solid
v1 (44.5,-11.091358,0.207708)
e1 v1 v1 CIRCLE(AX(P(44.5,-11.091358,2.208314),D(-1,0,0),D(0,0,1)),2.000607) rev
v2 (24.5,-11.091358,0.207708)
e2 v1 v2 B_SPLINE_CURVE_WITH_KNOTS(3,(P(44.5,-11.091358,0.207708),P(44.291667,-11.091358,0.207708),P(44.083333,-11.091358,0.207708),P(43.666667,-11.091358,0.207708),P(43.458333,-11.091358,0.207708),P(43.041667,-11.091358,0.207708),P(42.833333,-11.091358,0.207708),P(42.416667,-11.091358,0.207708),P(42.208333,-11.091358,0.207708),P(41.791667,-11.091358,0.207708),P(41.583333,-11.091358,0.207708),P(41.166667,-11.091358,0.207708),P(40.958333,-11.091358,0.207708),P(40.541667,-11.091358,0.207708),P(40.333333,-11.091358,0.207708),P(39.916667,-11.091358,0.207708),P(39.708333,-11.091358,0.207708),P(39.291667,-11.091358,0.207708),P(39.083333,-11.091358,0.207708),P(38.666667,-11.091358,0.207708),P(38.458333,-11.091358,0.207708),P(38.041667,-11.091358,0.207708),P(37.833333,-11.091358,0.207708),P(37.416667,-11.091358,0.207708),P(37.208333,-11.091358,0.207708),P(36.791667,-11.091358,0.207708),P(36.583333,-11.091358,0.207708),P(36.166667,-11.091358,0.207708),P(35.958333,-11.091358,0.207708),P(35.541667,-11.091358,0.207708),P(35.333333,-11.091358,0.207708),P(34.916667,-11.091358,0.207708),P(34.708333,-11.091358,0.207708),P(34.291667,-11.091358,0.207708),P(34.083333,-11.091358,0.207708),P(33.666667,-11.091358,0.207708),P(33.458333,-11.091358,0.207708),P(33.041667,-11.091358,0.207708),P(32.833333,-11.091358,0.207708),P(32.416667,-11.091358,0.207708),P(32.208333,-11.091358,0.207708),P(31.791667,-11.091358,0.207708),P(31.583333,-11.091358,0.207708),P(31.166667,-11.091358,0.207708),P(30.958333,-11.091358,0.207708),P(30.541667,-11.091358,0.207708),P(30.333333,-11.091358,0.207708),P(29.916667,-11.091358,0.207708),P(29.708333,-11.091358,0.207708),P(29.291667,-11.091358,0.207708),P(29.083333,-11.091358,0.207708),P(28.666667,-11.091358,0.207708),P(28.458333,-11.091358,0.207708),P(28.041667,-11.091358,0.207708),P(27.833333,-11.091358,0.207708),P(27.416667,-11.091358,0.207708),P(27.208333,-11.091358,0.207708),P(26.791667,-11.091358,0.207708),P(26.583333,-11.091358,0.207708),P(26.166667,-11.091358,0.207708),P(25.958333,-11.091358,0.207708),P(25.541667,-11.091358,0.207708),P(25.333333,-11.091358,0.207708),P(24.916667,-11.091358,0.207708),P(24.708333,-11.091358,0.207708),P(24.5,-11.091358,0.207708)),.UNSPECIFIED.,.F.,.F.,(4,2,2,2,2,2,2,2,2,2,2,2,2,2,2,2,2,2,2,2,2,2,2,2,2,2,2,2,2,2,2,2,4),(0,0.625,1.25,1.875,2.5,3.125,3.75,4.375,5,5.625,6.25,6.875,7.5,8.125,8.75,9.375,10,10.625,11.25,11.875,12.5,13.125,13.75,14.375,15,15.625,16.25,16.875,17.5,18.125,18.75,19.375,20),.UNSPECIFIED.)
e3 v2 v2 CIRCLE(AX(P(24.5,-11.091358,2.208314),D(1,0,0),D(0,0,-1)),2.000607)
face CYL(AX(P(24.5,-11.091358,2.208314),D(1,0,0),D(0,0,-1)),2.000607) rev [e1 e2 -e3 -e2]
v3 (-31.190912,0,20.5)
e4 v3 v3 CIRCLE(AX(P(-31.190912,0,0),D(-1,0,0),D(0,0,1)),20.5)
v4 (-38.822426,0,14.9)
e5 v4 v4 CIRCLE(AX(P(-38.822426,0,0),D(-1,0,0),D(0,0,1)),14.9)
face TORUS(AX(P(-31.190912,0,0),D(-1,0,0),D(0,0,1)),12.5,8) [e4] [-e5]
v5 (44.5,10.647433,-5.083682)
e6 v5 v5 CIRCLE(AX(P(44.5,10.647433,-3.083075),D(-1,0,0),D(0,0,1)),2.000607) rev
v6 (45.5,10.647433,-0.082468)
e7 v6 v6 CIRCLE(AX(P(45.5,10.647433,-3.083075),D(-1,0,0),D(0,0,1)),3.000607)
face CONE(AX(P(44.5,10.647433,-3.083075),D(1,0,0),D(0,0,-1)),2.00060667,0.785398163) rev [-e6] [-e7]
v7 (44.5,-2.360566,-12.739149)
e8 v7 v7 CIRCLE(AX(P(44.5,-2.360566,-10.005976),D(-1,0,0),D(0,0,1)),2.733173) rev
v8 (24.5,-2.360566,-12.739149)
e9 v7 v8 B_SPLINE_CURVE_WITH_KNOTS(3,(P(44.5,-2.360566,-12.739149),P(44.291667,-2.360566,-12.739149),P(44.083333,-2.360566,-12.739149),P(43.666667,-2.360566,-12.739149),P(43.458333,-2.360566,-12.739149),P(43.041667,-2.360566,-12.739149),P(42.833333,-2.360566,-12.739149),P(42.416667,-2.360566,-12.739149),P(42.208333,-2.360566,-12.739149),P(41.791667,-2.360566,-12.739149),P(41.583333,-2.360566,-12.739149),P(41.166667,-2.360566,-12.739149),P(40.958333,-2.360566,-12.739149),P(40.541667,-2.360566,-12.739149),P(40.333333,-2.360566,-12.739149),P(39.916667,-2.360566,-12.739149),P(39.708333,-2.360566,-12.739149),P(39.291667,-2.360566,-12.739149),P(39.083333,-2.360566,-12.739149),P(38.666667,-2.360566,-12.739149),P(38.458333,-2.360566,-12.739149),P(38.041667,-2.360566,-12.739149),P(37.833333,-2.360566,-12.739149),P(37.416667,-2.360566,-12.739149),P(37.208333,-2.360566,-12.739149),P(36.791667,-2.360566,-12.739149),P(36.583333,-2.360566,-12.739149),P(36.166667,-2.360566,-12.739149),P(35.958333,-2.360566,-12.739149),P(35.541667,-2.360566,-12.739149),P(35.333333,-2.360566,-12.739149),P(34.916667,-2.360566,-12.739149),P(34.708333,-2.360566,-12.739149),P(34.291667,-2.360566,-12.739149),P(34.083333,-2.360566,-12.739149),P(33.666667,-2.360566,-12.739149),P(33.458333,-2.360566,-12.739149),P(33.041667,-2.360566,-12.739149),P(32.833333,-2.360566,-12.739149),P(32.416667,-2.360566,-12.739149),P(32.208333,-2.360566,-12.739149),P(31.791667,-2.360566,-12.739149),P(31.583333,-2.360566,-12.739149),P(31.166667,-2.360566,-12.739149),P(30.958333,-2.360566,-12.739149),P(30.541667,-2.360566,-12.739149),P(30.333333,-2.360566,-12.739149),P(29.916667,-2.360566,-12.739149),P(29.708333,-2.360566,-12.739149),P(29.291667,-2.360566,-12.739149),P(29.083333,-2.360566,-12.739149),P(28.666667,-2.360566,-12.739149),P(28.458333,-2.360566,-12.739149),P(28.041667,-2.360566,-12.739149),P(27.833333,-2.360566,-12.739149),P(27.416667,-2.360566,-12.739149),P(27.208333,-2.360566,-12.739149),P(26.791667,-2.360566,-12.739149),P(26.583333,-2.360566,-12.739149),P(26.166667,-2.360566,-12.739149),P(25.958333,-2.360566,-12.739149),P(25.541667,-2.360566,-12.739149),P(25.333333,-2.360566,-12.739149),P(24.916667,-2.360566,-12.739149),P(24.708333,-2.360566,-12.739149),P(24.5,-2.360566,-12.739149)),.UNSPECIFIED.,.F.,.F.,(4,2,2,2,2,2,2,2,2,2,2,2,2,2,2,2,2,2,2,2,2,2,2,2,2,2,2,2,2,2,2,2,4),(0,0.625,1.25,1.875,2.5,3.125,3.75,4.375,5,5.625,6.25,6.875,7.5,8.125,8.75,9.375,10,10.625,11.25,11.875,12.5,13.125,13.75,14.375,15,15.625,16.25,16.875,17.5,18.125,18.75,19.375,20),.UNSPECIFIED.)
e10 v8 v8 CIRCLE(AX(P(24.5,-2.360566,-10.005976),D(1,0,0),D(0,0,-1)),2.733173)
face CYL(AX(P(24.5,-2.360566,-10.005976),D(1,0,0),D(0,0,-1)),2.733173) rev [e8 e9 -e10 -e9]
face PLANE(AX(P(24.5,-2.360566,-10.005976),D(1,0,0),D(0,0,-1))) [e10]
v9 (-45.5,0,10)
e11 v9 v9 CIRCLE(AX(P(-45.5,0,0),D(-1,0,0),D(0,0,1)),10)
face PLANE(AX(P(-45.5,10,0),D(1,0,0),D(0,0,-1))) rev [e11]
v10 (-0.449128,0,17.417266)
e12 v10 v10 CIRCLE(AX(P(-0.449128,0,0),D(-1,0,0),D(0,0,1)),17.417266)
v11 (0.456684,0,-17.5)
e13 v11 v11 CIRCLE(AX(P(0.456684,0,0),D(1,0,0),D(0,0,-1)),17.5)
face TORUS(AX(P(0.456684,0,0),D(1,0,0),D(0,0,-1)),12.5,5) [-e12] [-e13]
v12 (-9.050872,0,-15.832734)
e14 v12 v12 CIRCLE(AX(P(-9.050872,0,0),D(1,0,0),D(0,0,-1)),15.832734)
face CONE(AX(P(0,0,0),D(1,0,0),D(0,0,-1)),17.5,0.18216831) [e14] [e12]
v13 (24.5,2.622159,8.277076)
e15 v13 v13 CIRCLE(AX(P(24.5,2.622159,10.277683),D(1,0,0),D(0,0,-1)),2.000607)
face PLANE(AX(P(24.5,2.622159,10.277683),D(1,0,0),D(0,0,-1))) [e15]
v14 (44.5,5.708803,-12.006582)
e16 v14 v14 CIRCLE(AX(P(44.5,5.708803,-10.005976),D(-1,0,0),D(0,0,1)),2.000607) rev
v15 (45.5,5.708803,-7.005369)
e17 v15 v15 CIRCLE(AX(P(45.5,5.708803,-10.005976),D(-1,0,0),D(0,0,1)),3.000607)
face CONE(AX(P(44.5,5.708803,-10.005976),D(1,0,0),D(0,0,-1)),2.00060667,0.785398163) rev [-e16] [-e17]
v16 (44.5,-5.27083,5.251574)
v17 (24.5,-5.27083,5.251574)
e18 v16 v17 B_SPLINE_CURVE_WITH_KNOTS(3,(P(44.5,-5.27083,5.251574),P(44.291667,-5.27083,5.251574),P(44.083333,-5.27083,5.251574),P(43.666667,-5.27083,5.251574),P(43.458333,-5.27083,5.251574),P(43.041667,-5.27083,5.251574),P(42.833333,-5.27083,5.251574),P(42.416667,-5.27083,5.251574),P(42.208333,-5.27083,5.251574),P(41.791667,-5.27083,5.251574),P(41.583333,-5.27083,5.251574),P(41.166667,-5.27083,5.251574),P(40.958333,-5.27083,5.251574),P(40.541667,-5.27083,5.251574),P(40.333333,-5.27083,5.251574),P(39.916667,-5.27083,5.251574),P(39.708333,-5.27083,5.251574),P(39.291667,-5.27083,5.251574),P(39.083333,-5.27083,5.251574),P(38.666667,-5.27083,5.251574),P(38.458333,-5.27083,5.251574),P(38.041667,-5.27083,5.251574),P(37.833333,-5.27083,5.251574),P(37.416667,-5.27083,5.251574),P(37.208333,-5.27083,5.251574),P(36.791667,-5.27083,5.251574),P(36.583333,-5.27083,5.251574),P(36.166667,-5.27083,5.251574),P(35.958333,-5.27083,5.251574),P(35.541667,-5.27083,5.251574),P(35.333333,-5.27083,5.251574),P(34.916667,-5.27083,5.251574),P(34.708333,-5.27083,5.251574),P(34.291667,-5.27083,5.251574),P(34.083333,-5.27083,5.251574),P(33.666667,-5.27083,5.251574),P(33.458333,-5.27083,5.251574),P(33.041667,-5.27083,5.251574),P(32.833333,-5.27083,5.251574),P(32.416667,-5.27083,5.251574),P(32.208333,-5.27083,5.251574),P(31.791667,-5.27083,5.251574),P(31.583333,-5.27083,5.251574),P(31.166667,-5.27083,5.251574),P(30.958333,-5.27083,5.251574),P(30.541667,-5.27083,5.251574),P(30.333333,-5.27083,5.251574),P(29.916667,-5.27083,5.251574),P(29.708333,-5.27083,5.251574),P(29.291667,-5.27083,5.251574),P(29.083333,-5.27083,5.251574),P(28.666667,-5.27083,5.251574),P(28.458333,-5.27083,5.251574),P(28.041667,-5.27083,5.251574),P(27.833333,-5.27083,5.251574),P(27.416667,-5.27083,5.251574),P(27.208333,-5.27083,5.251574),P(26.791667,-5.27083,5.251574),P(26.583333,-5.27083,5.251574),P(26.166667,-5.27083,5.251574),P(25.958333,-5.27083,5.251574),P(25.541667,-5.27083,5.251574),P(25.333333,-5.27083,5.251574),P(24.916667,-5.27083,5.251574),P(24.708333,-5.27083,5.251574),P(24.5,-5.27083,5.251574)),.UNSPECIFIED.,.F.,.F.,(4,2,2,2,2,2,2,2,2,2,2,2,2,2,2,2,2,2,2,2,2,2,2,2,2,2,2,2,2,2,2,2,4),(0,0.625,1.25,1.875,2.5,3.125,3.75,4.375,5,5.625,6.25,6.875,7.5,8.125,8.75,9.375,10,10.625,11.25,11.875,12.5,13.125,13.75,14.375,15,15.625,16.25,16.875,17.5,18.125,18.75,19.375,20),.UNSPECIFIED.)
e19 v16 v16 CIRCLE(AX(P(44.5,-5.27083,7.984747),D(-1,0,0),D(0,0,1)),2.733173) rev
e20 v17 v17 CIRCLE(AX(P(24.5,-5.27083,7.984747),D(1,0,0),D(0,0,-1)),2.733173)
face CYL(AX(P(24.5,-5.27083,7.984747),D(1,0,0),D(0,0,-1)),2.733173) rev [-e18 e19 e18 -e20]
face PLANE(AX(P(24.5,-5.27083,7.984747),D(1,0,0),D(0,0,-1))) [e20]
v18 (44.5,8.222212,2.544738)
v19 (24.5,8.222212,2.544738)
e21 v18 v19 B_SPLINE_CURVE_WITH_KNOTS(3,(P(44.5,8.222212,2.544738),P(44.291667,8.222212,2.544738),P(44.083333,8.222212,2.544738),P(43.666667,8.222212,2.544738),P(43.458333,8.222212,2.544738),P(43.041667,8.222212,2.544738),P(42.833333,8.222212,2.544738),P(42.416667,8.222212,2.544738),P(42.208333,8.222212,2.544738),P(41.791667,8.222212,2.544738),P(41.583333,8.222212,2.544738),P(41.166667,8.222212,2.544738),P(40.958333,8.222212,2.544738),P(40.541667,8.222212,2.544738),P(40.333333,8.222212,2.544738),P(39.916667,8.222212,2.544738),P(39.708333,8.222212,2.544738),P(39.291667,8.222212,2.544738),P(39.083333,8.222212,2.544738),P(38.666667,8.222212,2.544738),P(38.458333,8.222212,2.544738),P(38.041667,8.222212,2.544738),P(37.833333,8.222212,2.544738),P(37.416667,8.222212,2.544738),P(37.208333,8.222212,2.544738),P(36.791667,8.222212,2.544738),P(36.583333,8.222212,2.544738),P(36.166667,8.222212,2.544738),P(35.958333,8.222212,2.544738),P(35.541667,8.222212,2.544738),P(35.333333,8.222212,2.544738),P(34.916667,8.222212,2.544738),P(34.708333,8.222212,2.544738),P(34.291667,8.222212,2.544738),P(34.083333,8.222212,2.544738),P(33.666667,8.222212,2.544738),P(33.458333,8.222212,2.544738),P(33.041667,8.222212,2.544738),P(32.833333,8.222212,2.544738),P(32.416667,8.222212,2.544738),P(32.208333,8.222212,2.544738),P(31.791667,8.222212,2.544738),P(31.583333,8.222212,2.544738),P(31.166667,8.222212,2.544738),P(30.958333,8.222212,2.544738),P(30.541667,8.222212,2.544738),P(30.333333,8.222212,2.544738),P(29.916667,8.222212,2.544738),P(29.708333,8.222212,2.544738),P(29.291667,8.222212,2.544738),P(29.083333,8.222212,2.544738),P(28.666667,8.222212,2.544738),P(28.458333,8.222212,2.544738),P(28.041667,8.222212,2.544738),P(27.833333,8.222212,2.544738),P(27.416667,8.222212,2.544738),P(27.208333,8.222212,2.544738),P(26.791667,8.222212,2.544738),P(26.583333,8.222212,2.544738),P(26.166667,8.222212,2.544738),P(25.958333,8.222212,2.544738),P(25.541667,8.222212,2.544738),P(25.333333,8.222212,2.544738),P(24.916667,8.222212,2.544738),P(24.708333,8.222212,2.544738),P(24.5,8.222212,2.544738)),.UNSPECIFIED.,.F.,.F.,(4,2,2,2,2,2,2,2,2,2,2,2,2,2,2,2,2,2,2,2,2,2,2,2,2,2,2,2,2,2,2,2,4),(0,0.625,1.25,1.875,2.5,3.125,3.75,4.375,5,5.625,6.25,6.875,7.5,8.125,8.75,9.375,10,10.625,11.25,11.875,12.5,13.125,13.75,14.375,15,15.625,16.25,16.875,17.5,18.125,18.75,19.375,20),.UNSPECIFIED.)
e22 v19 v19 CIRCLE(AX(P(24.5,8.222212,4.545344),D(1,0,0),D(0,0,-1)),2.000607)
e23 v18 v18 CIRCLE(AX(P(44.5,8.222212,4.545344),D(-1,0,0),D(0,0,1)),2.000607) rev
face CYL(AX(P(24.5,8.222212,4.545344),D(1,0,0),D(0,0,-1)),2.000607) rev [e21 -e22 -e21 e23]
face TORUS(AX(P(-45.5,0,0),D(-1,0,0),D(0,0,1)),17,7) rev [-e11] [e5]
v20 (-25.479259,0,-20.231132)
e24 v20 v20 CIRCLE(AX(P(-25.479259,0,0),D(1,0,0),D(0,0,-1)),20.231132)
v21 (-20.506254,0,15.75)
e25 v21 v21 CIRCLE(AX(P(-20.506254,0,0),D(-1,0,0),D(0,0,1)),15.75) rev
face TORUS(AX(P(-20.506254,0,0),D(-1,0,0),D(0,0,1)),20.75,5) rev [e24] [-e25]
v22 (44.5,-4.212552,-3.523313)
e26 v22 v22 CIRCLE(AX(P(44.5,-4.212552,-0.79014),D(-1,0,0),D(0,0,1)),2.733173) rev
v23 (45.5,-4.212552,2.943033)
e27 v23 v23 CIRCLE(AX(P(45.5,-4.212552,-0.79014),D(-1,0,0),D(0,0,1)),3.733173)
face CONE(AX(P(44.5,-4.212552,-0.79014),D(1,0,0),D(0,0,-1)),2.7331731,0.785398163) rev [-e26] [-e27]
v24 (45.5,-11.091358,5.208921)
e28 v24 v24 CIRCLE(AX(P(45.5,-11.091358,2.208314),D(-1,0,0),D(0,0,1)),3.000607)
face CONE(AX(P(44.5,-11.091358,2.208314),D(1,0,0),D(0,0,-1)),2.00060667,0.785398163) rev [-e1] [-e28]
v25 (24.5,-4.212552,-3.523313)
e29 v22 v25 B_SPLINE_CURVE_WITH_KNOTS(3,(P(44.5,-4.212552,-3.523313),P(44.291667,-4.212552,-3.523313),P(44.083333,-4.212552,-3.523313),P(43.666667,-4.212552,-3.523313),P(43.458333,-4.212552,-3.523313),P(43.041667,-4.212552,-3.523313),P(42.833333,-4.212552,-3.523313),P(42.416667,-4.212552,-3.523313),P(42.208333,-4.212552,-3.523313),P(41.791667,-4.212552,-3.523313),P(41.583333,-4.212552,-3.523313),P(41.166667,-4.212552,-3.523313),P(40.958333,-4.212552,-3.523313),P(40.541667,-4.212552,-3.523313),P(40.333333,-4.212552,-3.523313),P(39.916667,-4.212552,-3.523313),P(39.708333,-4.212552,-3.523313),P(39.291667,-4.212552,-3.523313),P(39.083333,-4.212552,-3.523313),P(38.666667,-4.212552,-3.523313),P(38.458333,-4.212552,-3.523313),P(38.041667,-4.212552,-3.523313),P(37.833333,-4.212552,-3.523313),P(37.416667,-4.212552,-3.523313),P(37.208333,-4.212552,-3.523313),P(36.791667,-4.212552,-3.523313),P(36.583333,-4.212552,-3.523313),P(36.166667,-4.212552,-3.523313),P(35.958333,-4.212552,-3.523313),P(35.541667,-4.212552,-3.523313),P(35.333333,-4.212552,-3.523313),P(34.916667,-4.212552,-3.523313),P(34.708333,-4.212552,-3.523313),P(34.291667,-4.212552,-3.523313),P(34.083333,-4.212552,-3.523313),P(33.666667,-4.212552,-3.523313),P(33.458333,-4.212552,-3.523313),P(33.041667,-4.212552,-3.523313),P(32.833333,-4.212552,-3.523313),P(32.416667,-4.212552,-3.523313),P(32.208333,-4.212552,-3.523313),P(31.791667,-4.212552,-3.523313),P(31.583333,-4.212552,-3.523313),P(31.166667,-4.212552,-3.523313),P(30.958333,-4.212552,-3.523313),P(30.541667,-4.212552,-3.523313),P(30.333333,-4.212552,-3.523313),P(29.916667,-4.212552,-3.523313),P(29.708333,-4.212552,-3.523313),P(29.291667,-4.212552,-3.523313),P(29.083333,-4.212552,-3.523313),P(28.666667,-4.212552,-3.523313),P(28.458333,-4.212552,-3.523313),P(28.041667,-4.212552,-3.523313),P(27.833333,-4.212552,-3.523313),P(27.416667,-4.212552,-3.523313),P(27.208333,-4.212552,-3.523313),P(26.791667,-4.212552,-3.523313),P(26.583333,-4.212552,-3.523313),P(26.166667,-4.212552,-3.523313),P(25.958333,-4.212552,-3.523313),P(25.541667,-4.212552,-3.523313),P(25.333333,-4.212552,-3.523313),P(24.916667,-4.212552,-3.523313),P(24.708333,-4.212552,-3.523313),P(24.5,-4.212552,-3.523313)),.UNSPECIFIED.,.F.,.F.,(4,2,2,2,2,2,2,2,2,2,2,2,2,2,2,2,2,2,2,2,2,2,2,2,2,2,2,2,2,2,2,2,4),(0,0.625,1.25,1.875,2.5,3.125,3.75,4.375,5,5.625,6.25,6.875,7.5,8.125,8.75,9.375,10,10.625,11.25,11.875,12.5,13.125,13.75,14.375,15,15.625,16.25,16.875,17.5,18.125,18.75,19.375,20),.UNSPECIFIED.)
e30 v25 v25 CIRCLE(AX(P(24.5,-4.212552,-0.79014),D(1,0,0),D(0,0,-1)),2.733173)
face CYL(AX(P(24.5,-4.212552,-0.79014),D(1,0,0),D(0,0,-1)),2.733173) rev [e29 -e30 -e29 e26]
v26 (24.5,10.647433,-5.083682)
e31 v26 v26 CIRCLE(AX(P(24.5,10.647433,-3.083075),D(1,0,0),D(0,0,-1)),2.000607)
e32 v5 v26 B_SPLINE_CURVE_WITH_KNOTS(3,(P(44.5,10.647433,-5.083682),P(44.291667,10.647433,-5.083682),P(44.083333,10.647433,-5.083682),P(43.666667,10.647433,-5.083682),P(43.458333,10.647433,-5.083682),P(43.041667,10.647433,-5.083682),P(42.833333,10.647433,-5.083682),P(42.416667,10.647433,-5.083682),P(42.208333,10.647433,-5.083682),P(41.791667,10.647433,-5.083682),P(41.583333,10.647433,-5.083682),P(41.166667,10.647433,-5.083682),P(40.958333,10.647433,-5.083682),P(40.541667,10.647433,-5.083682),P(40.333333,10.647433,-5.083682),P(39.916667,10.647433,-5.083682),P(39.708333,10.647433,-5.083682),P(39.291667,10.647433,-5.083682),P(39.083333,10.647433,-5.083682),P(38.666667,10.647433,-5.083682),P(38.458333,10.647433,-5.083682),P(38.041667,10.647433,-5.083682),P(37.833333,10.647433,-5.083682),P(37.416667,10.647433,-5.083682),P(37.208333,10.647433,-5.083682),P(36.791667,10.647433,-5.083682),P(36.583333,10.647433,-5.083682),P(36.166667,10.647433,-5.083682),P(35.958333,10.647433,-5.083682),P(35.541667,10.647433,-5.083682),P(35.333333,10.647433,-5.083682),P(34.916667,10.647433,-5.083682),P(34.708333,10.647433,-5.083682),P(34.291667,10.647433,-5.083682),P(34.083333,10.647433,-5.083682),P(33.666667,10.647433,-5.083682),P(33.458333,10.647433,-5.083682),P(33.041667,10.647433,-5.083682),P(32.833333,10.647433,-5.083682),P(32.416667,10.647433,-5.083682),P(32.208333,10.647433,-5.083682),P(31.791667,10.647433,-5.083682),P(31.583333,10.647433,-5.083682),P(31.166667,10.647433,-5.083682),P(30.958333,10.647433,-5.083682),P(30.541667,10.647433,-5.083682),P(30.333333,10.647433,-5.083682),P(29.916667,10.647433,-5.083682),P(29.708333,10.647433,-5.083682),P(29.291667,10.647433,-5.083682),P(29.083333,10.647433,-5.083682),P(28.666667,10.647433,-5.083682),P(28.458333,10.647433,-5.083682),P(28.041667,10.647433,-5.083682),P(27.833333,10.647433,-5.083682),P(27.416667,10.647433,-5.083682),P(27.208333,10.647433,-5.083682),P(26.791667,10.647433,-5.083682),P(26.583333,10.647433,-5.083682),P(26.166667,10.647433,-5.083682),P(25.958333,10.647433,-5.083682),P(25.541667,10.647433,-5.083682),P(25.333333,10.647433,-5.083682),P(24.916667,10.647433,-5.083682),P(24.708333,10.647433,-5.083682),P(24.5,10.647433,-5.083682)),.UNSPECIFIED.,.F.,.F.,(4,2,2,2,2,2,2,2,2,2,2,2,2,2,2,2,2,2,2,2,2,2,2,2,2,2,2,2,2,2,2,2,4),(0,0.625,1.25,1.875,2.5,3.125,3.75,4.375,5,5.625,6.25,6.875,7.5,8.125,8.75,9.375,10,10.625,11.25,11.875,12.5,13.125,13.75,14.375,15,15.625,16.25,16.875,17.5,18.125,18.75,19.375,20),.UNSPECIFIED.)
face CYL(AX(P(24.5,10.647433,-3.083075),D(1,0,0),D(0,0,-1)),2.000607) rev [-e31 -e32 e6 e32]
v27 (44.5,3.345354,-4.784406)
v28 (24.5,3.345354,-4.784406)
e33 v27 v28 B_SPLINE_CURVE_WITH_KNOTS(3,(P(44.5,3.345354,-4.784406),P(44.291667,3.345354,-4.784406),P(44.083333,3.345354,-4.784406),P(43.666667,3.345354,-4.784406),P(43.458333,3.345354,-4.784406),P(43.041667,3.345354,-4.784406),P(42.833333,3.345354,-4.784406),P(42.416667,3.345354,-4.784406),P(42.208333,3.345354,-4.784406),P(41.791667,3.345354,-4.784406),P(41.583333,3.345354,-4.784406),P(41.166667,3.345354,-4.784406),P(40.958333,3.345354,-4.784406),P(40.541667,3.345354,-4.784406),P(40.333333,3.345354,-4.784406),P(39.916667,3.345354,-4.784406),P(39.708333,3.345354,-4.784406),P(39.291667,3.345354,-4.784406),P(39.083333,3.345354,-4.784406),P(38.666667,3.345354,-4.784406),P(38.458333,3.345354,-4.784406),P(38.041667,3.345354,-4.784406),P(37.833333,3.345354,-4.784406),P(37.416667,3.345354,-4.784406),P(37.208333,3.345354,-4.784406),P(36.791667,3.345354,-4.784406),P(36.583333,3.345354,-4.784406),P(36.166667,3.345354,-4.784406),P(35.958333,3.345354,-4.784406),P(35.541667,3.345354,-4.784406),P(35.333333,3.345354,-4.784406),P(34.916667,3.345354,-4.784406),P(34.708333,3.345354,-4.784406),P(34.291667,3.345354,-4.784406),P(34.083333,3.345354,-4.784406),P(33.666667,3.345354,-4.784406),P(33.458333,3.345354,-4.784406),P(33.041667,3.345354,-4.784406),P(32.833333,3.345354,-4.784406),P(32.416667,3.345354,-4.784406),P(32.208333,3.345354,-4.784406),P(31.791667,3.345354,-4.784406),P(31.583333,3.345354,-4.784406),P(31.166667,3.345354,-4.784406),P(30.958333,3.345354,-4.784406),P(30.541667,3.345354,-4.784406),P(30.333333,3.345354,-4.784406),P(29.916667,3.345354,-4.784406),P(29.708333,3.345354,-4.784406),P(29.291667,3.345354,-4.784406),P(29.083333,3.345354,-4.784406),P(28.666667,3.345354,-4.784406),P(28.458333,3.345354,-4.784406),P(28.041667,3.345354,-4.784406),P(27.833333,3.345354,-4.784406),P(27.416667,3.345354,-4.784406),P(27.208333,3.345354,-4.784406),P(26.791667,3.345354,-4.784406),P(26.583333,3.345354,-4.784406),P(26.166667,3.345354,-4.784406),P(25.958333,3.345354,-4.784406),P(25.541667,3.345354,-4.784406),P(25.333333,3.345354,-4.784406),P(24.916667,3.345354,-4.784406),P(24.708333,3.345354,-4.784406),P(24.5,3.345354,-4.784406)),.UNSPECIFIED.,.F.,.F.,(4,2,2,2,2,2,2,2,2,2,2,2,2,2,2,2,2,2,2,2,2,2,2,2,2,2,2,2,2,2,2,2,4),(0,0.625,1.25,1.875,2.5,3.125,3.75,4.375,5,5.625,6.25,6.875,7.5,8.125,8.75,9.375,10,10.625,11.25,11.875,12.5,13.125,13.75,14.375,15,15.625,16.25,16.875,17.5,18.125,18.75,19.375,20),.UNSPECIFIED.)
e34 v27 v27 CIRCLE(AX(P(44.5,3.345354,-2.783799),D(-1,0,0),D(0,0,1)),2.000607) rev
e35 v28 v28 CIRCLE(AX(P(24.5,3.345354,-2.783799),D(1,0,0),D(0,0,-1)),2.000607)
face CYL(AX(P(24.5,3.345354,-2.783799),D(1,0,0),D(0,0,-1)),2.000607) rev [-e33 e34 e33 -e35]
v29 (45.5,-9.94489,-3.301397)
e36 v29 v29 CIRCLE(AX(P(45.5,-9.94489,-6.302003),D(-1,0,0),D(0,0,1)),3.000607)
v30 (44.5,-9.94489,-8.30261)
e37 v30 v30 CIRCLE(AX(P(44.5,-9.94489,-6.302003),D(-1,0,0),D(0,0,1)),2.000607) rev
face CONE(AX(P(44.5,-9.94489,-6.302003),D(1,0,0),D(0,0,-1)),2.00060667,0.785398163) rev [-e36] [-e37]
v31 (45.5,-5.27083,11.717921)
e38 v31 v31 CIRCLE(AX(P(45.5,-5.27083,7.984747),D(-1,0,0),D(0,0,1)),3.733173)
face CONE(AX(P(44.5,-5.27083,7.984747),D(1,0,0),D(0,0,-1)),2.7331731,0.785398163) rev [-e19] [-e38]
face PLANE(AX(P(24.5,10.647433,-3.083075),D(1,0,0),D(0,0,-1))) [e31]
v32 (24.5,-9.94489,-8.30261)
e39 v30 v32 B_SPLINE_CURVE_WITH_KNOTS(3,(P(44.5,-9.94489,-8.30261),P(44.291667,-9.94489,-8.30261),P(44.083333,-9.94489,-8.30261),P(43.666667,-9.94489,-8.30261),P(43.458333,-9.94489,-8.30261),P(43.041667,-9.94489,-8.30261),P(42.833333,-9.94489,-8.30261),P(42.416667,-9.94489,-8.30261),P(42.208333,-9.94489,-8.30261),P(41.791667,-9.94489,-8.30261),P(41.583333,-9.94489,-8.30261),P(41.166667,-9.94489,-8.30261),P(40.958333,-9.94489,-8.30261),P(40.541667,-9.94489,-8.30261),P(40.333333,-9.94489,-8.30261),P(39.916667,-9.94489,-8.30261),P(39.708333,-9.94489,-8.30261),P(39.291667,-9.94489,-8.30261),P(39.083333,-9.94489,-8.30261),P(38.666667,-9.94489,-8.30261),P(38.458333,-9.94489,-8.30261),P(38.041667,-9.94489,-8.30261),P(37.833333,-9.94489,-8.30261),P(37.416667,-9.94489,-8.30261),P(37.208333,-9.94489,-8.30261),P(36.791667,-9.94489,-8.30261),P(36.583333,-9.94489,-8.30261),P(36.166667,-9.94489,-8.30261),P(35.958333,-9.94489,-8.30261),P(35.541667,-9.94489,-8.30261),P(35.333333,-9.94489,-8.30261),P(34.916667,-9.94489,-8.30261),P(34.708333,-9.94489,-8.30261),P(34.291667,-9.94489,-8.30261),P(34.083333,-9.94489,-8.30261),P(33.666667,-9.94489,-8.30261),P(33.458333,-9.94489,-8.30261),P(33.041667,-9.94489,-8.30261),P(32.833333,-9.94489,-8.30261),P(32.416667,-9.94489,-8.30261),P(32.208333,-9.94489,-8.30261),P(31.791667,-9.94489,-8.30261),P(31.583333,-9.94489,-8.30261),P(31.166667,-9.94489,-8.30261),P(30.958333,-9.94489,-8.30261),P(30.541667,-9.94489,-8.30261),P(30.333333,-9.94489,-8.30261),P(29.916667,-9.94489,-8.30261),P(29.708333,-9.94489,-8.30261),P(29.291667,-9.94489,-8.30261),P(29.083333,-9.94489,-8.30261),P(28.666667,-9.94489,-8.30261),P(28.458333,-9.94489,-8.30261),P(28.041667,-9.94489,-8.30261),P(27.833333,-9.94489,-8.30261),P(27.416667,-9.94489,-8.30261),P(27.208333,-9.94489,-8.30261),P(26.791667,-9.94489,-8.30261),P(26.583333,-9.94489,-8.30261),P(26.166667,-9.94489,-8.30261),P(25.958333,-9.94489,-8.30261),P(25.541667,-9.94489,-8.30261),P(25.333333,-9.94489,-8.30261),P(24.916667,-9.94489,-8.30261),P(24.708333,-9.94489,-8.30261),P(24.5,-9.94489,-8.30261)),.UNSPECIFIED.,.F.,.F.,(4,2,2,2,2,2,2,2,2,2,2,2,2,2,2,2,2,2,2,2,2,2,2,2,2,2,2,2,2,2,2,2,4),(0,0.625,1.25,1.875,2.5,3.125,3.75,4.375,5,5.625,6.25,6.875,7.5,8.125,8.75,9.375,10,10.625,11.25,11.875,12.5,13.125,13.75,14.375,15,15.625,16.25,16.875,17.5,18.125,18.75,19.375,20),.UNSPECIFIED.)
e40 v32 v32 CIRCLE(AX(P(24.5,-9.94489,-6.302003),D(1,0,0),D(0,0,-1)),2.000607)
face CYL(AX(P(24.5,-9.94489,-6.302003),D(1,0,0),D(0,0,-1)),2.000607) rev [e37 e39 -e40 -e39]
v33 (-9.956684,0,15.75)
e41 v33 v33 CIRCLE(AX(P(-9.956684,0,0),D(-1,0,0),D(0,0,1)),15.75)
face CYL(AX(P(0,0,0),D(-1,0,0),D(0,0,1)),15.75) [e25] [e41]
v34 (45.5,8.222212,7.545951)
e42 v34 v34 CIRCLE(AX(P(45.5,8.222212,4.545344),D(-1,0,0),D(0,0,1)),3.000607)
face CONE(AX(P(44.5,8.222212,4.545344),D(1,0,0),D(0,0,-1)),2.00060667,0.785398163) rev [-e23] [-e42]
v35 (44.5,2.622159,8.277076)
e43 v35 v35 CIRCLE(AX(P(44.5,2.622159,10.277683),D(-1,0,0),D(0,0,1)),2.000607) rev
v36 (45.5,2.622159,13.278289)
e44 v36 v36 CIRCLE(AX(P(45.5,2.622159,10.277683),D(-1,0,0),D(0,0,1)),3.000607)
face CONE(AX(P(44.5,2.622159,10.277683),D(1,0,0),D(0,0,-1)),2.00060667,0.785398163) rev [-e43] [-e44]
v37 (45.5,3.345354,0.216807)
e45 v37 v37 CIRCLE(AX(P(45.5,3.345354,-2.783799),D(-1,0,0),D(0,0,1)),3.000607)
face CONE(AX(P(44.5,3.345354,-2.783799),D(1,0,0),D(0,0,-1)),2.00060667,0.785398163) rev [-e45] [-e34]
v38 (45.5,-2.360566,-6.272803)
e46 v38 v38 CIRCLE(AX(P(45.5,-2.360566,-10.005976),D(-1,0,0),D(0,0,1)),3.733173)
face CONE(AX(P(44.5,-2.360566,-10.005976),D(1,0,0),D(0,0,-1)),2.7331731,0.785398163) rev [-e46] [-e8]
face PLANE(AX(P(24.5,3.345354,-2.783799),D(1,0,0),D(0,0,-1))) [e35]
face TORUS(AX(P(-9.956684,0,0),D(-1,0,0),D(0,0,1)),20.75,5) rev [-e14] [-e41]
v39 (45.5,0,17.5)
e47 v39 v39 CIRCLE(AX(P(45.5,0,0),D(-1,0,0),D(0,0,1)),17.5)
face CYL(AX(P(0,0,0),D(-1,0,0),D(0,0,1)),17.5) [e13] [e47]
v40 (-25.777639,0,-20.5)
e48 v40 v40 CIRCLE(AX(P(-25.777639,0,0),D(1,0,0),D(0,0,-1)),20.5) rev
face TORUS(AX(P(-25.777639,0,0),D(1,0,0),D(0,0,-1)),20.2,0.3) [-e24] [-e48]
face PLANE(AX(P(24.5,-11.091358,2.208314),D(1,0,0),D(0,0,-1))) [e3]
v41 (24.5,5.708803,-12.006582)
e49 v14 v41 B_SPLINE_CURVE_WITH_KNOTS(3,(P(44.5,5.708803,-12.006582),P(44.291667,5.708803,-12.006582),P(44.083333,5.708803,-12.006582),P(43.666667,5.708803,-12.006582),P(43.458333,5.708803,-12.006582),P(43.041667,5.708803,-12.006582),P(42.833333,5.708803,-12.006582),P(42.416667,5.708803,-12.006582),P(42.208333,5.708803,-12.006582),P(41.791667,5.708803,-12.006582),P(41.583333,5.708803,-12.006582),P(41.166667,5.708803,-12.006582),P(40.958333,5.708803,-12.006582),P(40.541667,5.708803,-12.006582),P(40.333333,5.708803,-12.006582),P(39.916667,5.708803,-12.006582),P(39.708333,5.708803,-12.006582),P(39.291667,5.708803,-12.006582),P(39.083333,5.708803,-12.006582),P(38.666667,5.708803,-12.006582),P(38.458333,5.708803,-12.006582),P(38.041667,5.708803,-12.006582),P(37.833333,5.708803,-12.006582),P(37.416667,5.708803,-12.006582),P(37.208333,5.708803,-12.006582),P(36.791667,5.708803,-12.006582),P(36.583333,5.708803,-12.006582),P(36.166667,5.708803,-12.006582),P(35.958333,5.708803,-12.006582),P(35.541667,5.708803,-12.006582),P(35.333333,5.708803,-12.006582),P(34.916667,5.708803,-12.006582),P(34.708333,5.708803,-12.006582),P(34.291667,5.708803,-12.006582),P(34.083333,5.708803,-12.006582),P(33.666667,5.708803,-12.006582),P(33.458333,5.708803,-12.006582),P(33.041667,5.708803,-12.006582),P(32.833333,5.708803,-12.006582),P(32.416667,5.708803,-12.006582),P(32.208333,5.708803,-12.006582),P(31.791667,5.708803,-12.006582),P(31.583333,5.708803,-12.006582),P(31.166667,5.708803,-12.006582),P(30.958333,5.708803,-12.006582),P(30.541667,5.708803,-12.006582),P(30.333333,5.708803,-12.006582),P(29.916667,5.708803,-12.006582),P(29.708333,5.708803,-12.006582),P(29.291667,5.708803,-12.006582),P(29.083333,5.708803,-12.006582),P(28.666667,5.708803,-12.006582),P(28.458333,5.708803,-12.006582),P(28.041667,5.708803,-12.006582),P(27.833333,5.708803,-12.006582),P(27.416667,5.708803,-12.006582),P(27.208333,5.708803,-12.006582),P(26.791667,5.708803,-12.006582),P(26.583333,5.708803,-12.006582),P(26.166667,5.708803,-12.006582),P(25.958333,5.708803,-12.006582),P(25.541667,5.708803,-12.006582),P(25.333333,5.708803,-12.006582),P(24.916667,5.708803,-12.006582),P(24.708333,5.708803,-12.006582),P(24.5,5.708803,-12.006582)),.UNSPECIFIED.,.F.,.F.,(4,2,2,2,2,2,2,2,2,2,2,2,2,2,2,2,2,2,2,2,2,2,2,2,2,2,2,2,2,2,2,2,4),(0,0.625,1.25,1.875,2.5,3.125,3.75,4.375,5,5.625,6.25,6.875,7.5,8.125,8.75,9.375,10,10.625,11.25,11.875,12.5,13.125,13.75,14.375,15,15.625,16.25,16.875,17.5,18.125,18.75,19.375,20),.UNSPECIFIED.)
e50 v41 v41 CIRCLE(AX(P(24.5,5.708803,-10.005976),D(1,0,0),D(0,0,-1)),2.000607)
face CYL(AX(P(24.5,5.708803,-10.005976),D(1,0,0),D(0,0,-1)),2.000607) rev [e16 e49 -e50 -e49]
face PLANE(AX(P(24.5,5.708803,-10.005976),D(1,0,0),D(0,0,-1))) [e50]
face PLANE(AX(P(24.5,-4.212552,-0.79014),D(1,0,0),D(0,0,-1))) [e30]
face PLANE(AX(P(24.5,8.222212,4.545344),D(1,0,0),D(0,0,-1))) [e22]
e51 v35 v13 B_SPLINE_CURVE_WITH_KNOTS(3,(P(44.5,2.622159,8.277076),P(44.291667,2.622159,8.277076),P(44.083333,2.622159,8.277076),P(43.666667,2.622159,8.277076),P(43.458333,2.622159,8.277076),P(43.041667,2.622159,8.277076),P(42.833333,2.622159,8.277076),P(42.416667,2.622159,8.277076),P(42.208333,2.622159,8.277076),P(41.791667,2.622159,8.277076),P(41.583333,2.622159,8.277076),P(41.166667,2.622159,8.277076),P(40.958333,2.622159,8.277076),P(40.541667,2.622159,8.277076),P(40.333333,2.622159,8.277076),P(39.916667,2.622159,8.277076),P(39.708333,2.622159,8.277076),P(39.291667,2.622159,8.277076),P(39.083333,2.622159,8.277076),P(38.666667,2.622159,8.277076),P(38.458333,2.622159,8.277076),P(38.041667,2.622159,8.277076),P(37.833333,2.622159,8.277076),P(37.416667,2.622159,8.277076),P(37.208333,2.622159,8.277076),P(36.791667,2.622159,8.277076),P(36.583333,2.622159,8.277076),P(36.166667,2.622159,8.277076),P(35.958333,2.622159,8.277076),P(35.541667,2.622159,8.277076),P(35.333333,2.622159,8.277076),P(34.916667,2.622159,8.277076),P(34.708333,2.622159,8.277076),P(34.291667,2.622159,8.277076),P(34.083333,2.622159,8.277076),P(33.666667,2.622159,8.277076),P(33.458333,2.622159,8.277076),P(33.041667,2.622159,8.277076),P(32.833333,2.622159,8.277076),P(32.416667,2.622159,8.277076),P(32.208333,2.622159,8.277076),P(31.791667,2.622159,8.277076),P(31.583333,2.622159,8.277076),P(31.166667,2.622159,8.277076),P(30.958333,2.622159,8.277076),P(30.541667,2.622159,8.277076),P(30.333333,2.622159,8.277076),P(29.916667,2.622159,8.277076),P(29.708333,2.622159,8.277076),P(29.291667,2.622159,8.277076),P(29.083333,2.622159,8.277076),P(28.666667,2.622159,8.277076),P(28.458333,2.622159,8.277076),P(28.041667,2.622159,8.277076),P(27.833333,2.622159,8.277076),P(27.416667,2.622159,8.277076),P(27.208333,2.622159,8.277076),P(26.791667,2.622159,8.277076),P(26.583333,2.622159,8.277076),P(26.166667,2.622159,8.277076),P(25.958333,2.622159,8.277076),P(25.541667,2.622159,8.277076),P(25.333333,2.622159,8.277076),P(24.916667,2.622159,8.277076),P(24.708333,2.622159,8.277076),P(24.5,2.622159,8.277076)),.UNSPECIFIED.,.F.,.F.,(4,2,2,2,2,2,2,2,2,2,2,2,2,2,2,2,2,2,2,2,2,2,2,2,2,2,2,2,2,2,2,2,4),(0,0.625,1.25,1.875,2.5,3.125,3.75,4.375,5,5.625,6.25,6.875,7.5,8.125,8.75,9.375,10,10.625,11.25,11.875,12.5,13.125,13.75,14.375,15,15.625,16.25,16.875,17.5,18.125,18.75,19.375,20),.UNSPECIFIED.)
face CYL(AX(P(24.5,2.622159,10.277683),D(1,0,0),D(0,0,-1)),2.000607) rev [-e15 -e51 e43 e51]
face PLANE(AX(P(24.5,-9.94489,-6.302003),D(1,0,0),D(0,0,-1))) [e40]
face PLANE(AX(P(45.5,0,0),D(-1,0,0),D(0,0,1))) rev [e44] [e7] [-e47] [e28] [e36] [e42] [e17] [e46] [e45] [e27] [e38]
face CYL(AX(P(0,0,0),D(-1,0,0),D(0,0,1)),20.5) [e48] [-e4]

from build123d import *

# Parameters (mm, degrees)
FILLET1_R          = 5
FILLET2_R          = 0.3
FILLET3_R          = 5
SKETCH6_R          = 2.0006066698857174
SKETCH6_R_2        = 2.000606669885716
SKETCH6_R_3        = 2.733173099565215
SKETCH6_R_4        = 2.733173099565216
CUT_EXTRUDE1_DEPTH = 21
CHAMFER1_SIZE      = 1


with BuildPart() as part:
    # Sketch3 → Revolve1 (revolve)
    with BuildSketch(Plane.XY, mode=Mode.PRIVATE) as revolve1_sk:
        with BuildLine():
            Line((45.5, 0), (45.5, 17.499999999999996))
            Line((45.5, 17.499999999999996), (0, 17.500000000006253))
            Line((0, 17.500000000006253), (-9.5, 15.75))
            Line((-9.5, 15.75), (-25.499999999999996, 15.749999999999996))
            Line((-25.499999999999996, 15.749999999999996), (-25.499999999999996, 20.5))
            Line((-25.499999999999996, 20.5), (-31.190911978745817, 20.5))
            ThreePointArc((-31.190911978745817, 20.5), (-35.92377580522551, 18.949806198638836), (-38.82242559008138, 14.9))
            ThreePointArc((-38.82242559008138, 14.9), (-41.358744151830265, 11.356419576191016), (-45.5, 10))
            Line((-45.5, 10), (-45.5, 0))
            Line((-45.5, 0), (45.5, 0))
        make_face()
    revolve(revolve1_sk.sketch.rotate(Axis((0, 0, 0), (1, 0, 0)), 90), axis=Axis((0, 0, 0), (1, 0, 0)))

    # Fillet1
    # the kernel refuses this fillet: 5 mm, written as the material it adds along each edge
    with BuildSketch(Plane(origin=(-25.499999999999996, 0, 0), x_dir=(0, 1.1e-16, 1), z_dir=(0, 1, -1.1e-16))) as fillet1_piece_1:
        with BuildLine():
            CenterArc((20.75, 4.993746088859542), FILLET1_R, 180, 87.13401601740111)
            Line((20.5, -3.55e-15), (20.495, -0.09987492177719304))
            ThreePointArc((20.495, -0.09987492177719304), (18.125, -0.10000000000000142), (15.749999999999996, -0.10000000000000142))
            Line((15.749999999999996, -0.10000000000000142), (15.649999999999997, 0))
            Line((15.649999999999997, 0), (15.65, 4.993746088859542))
            Line((15.65, 4.993746088859542), (15.75, 4.993746088859542))
        make_face()
    revolve(axis=Axis((-25.499999999999996, 0, 0), (1, 0, 0)))

    # Fillet2
    fillet2_edges = [part.edges().sort_by_distance(p)[0] for p in [
        (-25.499999999999996, -1.389e-14, -20.5),
    ]]
    fillet(fillet2_edges, radius=FILLET2_R)

    # Fillet3
    fillet3_edges = [part.edges().sort_by_distance(p)[0] for p in [
        (0, -4.09e-15, -17.500000000006253),
        (-9.5, -3.68e-15, -15.75),
    ]]
    fillet(fillet3_edges, radius=FILLET3_R)

    # Sketch6 → Cut-Extrude1 (cut)
    with BuildSketch(Plane(origin=(45.5, 0, 0), x_dir=(0, 0, -1), z_dir=(1, 0, 0))):
        with Locations((2.783799240820242, 3.3453538559838196)):
            Circle(SKETCH6_R)
        with Locations((3.0830749079385766, 10.64743253142253)):
            Circle(SKETCH6_R_2)
        with Locations((-4.545344467144663, 8.222212498881614)):
            Circle(SKETCH6_R)
        with Locations((-10.277682725877737, 2.6221589691962284)):
            Circle(SKETCH6_R_2)
        with Locations((10.005975728100823, 5.708802646975575)):
            Circle(SKETCH6_R_2)
        with Locations((-2.2083142539688767, -11.091357942080581)):
            Circle(SKETCH6_R)
        with Locations((6.30200331476561, -9.944890290333964)):
            Circle(SKETCH6_R_2)
        with Locations((10.005975728100823, -2.3605658249332846)):
            Circle(SKETCH6_R_3)
        with Locations((0.7901396044453501, -4.212552031600895)):
            Circle(SKETCH6_R_3)
        with Locations((-7.98474742238451, -5.270829863982385)):
            Circle(SKETCH6_R_4)
    extrude(amount=-CUT_EXTRUDE1_DEPTH, mode=Mode.SUBTRACT)

    # Chamfer1
    chamfer1_edges = [part.edges().sort_by_distance(p)[0] for p in [
        (45.5, 5.708802646975575, -8.005369058215107),
        (45.5, 2.622158969196229, 12.278289395763453),
        (45.5, 8.222212498881614, 6.5459511370303805),
        (45.5, 10.64743253142253, -1.0824682380528605),
        (45.5, -11.091357942080581, 4.208920923854594),
        (45.5, -9.944890290333964, -4.301396644879894),
        (45.5, -2.3605658249332855, -7.272802628535608),
        (45.5, -4.212552031600896, 1.943033495119865),
        (45.5, -5.270829863982385, 10.717920521949726),
        (45.5, 3.34535385598382, -0.7831925709345247),
    ]]
    chamfer(chamfer1_edges, length=CHAMFER1_SIZE)


solid = part.part
